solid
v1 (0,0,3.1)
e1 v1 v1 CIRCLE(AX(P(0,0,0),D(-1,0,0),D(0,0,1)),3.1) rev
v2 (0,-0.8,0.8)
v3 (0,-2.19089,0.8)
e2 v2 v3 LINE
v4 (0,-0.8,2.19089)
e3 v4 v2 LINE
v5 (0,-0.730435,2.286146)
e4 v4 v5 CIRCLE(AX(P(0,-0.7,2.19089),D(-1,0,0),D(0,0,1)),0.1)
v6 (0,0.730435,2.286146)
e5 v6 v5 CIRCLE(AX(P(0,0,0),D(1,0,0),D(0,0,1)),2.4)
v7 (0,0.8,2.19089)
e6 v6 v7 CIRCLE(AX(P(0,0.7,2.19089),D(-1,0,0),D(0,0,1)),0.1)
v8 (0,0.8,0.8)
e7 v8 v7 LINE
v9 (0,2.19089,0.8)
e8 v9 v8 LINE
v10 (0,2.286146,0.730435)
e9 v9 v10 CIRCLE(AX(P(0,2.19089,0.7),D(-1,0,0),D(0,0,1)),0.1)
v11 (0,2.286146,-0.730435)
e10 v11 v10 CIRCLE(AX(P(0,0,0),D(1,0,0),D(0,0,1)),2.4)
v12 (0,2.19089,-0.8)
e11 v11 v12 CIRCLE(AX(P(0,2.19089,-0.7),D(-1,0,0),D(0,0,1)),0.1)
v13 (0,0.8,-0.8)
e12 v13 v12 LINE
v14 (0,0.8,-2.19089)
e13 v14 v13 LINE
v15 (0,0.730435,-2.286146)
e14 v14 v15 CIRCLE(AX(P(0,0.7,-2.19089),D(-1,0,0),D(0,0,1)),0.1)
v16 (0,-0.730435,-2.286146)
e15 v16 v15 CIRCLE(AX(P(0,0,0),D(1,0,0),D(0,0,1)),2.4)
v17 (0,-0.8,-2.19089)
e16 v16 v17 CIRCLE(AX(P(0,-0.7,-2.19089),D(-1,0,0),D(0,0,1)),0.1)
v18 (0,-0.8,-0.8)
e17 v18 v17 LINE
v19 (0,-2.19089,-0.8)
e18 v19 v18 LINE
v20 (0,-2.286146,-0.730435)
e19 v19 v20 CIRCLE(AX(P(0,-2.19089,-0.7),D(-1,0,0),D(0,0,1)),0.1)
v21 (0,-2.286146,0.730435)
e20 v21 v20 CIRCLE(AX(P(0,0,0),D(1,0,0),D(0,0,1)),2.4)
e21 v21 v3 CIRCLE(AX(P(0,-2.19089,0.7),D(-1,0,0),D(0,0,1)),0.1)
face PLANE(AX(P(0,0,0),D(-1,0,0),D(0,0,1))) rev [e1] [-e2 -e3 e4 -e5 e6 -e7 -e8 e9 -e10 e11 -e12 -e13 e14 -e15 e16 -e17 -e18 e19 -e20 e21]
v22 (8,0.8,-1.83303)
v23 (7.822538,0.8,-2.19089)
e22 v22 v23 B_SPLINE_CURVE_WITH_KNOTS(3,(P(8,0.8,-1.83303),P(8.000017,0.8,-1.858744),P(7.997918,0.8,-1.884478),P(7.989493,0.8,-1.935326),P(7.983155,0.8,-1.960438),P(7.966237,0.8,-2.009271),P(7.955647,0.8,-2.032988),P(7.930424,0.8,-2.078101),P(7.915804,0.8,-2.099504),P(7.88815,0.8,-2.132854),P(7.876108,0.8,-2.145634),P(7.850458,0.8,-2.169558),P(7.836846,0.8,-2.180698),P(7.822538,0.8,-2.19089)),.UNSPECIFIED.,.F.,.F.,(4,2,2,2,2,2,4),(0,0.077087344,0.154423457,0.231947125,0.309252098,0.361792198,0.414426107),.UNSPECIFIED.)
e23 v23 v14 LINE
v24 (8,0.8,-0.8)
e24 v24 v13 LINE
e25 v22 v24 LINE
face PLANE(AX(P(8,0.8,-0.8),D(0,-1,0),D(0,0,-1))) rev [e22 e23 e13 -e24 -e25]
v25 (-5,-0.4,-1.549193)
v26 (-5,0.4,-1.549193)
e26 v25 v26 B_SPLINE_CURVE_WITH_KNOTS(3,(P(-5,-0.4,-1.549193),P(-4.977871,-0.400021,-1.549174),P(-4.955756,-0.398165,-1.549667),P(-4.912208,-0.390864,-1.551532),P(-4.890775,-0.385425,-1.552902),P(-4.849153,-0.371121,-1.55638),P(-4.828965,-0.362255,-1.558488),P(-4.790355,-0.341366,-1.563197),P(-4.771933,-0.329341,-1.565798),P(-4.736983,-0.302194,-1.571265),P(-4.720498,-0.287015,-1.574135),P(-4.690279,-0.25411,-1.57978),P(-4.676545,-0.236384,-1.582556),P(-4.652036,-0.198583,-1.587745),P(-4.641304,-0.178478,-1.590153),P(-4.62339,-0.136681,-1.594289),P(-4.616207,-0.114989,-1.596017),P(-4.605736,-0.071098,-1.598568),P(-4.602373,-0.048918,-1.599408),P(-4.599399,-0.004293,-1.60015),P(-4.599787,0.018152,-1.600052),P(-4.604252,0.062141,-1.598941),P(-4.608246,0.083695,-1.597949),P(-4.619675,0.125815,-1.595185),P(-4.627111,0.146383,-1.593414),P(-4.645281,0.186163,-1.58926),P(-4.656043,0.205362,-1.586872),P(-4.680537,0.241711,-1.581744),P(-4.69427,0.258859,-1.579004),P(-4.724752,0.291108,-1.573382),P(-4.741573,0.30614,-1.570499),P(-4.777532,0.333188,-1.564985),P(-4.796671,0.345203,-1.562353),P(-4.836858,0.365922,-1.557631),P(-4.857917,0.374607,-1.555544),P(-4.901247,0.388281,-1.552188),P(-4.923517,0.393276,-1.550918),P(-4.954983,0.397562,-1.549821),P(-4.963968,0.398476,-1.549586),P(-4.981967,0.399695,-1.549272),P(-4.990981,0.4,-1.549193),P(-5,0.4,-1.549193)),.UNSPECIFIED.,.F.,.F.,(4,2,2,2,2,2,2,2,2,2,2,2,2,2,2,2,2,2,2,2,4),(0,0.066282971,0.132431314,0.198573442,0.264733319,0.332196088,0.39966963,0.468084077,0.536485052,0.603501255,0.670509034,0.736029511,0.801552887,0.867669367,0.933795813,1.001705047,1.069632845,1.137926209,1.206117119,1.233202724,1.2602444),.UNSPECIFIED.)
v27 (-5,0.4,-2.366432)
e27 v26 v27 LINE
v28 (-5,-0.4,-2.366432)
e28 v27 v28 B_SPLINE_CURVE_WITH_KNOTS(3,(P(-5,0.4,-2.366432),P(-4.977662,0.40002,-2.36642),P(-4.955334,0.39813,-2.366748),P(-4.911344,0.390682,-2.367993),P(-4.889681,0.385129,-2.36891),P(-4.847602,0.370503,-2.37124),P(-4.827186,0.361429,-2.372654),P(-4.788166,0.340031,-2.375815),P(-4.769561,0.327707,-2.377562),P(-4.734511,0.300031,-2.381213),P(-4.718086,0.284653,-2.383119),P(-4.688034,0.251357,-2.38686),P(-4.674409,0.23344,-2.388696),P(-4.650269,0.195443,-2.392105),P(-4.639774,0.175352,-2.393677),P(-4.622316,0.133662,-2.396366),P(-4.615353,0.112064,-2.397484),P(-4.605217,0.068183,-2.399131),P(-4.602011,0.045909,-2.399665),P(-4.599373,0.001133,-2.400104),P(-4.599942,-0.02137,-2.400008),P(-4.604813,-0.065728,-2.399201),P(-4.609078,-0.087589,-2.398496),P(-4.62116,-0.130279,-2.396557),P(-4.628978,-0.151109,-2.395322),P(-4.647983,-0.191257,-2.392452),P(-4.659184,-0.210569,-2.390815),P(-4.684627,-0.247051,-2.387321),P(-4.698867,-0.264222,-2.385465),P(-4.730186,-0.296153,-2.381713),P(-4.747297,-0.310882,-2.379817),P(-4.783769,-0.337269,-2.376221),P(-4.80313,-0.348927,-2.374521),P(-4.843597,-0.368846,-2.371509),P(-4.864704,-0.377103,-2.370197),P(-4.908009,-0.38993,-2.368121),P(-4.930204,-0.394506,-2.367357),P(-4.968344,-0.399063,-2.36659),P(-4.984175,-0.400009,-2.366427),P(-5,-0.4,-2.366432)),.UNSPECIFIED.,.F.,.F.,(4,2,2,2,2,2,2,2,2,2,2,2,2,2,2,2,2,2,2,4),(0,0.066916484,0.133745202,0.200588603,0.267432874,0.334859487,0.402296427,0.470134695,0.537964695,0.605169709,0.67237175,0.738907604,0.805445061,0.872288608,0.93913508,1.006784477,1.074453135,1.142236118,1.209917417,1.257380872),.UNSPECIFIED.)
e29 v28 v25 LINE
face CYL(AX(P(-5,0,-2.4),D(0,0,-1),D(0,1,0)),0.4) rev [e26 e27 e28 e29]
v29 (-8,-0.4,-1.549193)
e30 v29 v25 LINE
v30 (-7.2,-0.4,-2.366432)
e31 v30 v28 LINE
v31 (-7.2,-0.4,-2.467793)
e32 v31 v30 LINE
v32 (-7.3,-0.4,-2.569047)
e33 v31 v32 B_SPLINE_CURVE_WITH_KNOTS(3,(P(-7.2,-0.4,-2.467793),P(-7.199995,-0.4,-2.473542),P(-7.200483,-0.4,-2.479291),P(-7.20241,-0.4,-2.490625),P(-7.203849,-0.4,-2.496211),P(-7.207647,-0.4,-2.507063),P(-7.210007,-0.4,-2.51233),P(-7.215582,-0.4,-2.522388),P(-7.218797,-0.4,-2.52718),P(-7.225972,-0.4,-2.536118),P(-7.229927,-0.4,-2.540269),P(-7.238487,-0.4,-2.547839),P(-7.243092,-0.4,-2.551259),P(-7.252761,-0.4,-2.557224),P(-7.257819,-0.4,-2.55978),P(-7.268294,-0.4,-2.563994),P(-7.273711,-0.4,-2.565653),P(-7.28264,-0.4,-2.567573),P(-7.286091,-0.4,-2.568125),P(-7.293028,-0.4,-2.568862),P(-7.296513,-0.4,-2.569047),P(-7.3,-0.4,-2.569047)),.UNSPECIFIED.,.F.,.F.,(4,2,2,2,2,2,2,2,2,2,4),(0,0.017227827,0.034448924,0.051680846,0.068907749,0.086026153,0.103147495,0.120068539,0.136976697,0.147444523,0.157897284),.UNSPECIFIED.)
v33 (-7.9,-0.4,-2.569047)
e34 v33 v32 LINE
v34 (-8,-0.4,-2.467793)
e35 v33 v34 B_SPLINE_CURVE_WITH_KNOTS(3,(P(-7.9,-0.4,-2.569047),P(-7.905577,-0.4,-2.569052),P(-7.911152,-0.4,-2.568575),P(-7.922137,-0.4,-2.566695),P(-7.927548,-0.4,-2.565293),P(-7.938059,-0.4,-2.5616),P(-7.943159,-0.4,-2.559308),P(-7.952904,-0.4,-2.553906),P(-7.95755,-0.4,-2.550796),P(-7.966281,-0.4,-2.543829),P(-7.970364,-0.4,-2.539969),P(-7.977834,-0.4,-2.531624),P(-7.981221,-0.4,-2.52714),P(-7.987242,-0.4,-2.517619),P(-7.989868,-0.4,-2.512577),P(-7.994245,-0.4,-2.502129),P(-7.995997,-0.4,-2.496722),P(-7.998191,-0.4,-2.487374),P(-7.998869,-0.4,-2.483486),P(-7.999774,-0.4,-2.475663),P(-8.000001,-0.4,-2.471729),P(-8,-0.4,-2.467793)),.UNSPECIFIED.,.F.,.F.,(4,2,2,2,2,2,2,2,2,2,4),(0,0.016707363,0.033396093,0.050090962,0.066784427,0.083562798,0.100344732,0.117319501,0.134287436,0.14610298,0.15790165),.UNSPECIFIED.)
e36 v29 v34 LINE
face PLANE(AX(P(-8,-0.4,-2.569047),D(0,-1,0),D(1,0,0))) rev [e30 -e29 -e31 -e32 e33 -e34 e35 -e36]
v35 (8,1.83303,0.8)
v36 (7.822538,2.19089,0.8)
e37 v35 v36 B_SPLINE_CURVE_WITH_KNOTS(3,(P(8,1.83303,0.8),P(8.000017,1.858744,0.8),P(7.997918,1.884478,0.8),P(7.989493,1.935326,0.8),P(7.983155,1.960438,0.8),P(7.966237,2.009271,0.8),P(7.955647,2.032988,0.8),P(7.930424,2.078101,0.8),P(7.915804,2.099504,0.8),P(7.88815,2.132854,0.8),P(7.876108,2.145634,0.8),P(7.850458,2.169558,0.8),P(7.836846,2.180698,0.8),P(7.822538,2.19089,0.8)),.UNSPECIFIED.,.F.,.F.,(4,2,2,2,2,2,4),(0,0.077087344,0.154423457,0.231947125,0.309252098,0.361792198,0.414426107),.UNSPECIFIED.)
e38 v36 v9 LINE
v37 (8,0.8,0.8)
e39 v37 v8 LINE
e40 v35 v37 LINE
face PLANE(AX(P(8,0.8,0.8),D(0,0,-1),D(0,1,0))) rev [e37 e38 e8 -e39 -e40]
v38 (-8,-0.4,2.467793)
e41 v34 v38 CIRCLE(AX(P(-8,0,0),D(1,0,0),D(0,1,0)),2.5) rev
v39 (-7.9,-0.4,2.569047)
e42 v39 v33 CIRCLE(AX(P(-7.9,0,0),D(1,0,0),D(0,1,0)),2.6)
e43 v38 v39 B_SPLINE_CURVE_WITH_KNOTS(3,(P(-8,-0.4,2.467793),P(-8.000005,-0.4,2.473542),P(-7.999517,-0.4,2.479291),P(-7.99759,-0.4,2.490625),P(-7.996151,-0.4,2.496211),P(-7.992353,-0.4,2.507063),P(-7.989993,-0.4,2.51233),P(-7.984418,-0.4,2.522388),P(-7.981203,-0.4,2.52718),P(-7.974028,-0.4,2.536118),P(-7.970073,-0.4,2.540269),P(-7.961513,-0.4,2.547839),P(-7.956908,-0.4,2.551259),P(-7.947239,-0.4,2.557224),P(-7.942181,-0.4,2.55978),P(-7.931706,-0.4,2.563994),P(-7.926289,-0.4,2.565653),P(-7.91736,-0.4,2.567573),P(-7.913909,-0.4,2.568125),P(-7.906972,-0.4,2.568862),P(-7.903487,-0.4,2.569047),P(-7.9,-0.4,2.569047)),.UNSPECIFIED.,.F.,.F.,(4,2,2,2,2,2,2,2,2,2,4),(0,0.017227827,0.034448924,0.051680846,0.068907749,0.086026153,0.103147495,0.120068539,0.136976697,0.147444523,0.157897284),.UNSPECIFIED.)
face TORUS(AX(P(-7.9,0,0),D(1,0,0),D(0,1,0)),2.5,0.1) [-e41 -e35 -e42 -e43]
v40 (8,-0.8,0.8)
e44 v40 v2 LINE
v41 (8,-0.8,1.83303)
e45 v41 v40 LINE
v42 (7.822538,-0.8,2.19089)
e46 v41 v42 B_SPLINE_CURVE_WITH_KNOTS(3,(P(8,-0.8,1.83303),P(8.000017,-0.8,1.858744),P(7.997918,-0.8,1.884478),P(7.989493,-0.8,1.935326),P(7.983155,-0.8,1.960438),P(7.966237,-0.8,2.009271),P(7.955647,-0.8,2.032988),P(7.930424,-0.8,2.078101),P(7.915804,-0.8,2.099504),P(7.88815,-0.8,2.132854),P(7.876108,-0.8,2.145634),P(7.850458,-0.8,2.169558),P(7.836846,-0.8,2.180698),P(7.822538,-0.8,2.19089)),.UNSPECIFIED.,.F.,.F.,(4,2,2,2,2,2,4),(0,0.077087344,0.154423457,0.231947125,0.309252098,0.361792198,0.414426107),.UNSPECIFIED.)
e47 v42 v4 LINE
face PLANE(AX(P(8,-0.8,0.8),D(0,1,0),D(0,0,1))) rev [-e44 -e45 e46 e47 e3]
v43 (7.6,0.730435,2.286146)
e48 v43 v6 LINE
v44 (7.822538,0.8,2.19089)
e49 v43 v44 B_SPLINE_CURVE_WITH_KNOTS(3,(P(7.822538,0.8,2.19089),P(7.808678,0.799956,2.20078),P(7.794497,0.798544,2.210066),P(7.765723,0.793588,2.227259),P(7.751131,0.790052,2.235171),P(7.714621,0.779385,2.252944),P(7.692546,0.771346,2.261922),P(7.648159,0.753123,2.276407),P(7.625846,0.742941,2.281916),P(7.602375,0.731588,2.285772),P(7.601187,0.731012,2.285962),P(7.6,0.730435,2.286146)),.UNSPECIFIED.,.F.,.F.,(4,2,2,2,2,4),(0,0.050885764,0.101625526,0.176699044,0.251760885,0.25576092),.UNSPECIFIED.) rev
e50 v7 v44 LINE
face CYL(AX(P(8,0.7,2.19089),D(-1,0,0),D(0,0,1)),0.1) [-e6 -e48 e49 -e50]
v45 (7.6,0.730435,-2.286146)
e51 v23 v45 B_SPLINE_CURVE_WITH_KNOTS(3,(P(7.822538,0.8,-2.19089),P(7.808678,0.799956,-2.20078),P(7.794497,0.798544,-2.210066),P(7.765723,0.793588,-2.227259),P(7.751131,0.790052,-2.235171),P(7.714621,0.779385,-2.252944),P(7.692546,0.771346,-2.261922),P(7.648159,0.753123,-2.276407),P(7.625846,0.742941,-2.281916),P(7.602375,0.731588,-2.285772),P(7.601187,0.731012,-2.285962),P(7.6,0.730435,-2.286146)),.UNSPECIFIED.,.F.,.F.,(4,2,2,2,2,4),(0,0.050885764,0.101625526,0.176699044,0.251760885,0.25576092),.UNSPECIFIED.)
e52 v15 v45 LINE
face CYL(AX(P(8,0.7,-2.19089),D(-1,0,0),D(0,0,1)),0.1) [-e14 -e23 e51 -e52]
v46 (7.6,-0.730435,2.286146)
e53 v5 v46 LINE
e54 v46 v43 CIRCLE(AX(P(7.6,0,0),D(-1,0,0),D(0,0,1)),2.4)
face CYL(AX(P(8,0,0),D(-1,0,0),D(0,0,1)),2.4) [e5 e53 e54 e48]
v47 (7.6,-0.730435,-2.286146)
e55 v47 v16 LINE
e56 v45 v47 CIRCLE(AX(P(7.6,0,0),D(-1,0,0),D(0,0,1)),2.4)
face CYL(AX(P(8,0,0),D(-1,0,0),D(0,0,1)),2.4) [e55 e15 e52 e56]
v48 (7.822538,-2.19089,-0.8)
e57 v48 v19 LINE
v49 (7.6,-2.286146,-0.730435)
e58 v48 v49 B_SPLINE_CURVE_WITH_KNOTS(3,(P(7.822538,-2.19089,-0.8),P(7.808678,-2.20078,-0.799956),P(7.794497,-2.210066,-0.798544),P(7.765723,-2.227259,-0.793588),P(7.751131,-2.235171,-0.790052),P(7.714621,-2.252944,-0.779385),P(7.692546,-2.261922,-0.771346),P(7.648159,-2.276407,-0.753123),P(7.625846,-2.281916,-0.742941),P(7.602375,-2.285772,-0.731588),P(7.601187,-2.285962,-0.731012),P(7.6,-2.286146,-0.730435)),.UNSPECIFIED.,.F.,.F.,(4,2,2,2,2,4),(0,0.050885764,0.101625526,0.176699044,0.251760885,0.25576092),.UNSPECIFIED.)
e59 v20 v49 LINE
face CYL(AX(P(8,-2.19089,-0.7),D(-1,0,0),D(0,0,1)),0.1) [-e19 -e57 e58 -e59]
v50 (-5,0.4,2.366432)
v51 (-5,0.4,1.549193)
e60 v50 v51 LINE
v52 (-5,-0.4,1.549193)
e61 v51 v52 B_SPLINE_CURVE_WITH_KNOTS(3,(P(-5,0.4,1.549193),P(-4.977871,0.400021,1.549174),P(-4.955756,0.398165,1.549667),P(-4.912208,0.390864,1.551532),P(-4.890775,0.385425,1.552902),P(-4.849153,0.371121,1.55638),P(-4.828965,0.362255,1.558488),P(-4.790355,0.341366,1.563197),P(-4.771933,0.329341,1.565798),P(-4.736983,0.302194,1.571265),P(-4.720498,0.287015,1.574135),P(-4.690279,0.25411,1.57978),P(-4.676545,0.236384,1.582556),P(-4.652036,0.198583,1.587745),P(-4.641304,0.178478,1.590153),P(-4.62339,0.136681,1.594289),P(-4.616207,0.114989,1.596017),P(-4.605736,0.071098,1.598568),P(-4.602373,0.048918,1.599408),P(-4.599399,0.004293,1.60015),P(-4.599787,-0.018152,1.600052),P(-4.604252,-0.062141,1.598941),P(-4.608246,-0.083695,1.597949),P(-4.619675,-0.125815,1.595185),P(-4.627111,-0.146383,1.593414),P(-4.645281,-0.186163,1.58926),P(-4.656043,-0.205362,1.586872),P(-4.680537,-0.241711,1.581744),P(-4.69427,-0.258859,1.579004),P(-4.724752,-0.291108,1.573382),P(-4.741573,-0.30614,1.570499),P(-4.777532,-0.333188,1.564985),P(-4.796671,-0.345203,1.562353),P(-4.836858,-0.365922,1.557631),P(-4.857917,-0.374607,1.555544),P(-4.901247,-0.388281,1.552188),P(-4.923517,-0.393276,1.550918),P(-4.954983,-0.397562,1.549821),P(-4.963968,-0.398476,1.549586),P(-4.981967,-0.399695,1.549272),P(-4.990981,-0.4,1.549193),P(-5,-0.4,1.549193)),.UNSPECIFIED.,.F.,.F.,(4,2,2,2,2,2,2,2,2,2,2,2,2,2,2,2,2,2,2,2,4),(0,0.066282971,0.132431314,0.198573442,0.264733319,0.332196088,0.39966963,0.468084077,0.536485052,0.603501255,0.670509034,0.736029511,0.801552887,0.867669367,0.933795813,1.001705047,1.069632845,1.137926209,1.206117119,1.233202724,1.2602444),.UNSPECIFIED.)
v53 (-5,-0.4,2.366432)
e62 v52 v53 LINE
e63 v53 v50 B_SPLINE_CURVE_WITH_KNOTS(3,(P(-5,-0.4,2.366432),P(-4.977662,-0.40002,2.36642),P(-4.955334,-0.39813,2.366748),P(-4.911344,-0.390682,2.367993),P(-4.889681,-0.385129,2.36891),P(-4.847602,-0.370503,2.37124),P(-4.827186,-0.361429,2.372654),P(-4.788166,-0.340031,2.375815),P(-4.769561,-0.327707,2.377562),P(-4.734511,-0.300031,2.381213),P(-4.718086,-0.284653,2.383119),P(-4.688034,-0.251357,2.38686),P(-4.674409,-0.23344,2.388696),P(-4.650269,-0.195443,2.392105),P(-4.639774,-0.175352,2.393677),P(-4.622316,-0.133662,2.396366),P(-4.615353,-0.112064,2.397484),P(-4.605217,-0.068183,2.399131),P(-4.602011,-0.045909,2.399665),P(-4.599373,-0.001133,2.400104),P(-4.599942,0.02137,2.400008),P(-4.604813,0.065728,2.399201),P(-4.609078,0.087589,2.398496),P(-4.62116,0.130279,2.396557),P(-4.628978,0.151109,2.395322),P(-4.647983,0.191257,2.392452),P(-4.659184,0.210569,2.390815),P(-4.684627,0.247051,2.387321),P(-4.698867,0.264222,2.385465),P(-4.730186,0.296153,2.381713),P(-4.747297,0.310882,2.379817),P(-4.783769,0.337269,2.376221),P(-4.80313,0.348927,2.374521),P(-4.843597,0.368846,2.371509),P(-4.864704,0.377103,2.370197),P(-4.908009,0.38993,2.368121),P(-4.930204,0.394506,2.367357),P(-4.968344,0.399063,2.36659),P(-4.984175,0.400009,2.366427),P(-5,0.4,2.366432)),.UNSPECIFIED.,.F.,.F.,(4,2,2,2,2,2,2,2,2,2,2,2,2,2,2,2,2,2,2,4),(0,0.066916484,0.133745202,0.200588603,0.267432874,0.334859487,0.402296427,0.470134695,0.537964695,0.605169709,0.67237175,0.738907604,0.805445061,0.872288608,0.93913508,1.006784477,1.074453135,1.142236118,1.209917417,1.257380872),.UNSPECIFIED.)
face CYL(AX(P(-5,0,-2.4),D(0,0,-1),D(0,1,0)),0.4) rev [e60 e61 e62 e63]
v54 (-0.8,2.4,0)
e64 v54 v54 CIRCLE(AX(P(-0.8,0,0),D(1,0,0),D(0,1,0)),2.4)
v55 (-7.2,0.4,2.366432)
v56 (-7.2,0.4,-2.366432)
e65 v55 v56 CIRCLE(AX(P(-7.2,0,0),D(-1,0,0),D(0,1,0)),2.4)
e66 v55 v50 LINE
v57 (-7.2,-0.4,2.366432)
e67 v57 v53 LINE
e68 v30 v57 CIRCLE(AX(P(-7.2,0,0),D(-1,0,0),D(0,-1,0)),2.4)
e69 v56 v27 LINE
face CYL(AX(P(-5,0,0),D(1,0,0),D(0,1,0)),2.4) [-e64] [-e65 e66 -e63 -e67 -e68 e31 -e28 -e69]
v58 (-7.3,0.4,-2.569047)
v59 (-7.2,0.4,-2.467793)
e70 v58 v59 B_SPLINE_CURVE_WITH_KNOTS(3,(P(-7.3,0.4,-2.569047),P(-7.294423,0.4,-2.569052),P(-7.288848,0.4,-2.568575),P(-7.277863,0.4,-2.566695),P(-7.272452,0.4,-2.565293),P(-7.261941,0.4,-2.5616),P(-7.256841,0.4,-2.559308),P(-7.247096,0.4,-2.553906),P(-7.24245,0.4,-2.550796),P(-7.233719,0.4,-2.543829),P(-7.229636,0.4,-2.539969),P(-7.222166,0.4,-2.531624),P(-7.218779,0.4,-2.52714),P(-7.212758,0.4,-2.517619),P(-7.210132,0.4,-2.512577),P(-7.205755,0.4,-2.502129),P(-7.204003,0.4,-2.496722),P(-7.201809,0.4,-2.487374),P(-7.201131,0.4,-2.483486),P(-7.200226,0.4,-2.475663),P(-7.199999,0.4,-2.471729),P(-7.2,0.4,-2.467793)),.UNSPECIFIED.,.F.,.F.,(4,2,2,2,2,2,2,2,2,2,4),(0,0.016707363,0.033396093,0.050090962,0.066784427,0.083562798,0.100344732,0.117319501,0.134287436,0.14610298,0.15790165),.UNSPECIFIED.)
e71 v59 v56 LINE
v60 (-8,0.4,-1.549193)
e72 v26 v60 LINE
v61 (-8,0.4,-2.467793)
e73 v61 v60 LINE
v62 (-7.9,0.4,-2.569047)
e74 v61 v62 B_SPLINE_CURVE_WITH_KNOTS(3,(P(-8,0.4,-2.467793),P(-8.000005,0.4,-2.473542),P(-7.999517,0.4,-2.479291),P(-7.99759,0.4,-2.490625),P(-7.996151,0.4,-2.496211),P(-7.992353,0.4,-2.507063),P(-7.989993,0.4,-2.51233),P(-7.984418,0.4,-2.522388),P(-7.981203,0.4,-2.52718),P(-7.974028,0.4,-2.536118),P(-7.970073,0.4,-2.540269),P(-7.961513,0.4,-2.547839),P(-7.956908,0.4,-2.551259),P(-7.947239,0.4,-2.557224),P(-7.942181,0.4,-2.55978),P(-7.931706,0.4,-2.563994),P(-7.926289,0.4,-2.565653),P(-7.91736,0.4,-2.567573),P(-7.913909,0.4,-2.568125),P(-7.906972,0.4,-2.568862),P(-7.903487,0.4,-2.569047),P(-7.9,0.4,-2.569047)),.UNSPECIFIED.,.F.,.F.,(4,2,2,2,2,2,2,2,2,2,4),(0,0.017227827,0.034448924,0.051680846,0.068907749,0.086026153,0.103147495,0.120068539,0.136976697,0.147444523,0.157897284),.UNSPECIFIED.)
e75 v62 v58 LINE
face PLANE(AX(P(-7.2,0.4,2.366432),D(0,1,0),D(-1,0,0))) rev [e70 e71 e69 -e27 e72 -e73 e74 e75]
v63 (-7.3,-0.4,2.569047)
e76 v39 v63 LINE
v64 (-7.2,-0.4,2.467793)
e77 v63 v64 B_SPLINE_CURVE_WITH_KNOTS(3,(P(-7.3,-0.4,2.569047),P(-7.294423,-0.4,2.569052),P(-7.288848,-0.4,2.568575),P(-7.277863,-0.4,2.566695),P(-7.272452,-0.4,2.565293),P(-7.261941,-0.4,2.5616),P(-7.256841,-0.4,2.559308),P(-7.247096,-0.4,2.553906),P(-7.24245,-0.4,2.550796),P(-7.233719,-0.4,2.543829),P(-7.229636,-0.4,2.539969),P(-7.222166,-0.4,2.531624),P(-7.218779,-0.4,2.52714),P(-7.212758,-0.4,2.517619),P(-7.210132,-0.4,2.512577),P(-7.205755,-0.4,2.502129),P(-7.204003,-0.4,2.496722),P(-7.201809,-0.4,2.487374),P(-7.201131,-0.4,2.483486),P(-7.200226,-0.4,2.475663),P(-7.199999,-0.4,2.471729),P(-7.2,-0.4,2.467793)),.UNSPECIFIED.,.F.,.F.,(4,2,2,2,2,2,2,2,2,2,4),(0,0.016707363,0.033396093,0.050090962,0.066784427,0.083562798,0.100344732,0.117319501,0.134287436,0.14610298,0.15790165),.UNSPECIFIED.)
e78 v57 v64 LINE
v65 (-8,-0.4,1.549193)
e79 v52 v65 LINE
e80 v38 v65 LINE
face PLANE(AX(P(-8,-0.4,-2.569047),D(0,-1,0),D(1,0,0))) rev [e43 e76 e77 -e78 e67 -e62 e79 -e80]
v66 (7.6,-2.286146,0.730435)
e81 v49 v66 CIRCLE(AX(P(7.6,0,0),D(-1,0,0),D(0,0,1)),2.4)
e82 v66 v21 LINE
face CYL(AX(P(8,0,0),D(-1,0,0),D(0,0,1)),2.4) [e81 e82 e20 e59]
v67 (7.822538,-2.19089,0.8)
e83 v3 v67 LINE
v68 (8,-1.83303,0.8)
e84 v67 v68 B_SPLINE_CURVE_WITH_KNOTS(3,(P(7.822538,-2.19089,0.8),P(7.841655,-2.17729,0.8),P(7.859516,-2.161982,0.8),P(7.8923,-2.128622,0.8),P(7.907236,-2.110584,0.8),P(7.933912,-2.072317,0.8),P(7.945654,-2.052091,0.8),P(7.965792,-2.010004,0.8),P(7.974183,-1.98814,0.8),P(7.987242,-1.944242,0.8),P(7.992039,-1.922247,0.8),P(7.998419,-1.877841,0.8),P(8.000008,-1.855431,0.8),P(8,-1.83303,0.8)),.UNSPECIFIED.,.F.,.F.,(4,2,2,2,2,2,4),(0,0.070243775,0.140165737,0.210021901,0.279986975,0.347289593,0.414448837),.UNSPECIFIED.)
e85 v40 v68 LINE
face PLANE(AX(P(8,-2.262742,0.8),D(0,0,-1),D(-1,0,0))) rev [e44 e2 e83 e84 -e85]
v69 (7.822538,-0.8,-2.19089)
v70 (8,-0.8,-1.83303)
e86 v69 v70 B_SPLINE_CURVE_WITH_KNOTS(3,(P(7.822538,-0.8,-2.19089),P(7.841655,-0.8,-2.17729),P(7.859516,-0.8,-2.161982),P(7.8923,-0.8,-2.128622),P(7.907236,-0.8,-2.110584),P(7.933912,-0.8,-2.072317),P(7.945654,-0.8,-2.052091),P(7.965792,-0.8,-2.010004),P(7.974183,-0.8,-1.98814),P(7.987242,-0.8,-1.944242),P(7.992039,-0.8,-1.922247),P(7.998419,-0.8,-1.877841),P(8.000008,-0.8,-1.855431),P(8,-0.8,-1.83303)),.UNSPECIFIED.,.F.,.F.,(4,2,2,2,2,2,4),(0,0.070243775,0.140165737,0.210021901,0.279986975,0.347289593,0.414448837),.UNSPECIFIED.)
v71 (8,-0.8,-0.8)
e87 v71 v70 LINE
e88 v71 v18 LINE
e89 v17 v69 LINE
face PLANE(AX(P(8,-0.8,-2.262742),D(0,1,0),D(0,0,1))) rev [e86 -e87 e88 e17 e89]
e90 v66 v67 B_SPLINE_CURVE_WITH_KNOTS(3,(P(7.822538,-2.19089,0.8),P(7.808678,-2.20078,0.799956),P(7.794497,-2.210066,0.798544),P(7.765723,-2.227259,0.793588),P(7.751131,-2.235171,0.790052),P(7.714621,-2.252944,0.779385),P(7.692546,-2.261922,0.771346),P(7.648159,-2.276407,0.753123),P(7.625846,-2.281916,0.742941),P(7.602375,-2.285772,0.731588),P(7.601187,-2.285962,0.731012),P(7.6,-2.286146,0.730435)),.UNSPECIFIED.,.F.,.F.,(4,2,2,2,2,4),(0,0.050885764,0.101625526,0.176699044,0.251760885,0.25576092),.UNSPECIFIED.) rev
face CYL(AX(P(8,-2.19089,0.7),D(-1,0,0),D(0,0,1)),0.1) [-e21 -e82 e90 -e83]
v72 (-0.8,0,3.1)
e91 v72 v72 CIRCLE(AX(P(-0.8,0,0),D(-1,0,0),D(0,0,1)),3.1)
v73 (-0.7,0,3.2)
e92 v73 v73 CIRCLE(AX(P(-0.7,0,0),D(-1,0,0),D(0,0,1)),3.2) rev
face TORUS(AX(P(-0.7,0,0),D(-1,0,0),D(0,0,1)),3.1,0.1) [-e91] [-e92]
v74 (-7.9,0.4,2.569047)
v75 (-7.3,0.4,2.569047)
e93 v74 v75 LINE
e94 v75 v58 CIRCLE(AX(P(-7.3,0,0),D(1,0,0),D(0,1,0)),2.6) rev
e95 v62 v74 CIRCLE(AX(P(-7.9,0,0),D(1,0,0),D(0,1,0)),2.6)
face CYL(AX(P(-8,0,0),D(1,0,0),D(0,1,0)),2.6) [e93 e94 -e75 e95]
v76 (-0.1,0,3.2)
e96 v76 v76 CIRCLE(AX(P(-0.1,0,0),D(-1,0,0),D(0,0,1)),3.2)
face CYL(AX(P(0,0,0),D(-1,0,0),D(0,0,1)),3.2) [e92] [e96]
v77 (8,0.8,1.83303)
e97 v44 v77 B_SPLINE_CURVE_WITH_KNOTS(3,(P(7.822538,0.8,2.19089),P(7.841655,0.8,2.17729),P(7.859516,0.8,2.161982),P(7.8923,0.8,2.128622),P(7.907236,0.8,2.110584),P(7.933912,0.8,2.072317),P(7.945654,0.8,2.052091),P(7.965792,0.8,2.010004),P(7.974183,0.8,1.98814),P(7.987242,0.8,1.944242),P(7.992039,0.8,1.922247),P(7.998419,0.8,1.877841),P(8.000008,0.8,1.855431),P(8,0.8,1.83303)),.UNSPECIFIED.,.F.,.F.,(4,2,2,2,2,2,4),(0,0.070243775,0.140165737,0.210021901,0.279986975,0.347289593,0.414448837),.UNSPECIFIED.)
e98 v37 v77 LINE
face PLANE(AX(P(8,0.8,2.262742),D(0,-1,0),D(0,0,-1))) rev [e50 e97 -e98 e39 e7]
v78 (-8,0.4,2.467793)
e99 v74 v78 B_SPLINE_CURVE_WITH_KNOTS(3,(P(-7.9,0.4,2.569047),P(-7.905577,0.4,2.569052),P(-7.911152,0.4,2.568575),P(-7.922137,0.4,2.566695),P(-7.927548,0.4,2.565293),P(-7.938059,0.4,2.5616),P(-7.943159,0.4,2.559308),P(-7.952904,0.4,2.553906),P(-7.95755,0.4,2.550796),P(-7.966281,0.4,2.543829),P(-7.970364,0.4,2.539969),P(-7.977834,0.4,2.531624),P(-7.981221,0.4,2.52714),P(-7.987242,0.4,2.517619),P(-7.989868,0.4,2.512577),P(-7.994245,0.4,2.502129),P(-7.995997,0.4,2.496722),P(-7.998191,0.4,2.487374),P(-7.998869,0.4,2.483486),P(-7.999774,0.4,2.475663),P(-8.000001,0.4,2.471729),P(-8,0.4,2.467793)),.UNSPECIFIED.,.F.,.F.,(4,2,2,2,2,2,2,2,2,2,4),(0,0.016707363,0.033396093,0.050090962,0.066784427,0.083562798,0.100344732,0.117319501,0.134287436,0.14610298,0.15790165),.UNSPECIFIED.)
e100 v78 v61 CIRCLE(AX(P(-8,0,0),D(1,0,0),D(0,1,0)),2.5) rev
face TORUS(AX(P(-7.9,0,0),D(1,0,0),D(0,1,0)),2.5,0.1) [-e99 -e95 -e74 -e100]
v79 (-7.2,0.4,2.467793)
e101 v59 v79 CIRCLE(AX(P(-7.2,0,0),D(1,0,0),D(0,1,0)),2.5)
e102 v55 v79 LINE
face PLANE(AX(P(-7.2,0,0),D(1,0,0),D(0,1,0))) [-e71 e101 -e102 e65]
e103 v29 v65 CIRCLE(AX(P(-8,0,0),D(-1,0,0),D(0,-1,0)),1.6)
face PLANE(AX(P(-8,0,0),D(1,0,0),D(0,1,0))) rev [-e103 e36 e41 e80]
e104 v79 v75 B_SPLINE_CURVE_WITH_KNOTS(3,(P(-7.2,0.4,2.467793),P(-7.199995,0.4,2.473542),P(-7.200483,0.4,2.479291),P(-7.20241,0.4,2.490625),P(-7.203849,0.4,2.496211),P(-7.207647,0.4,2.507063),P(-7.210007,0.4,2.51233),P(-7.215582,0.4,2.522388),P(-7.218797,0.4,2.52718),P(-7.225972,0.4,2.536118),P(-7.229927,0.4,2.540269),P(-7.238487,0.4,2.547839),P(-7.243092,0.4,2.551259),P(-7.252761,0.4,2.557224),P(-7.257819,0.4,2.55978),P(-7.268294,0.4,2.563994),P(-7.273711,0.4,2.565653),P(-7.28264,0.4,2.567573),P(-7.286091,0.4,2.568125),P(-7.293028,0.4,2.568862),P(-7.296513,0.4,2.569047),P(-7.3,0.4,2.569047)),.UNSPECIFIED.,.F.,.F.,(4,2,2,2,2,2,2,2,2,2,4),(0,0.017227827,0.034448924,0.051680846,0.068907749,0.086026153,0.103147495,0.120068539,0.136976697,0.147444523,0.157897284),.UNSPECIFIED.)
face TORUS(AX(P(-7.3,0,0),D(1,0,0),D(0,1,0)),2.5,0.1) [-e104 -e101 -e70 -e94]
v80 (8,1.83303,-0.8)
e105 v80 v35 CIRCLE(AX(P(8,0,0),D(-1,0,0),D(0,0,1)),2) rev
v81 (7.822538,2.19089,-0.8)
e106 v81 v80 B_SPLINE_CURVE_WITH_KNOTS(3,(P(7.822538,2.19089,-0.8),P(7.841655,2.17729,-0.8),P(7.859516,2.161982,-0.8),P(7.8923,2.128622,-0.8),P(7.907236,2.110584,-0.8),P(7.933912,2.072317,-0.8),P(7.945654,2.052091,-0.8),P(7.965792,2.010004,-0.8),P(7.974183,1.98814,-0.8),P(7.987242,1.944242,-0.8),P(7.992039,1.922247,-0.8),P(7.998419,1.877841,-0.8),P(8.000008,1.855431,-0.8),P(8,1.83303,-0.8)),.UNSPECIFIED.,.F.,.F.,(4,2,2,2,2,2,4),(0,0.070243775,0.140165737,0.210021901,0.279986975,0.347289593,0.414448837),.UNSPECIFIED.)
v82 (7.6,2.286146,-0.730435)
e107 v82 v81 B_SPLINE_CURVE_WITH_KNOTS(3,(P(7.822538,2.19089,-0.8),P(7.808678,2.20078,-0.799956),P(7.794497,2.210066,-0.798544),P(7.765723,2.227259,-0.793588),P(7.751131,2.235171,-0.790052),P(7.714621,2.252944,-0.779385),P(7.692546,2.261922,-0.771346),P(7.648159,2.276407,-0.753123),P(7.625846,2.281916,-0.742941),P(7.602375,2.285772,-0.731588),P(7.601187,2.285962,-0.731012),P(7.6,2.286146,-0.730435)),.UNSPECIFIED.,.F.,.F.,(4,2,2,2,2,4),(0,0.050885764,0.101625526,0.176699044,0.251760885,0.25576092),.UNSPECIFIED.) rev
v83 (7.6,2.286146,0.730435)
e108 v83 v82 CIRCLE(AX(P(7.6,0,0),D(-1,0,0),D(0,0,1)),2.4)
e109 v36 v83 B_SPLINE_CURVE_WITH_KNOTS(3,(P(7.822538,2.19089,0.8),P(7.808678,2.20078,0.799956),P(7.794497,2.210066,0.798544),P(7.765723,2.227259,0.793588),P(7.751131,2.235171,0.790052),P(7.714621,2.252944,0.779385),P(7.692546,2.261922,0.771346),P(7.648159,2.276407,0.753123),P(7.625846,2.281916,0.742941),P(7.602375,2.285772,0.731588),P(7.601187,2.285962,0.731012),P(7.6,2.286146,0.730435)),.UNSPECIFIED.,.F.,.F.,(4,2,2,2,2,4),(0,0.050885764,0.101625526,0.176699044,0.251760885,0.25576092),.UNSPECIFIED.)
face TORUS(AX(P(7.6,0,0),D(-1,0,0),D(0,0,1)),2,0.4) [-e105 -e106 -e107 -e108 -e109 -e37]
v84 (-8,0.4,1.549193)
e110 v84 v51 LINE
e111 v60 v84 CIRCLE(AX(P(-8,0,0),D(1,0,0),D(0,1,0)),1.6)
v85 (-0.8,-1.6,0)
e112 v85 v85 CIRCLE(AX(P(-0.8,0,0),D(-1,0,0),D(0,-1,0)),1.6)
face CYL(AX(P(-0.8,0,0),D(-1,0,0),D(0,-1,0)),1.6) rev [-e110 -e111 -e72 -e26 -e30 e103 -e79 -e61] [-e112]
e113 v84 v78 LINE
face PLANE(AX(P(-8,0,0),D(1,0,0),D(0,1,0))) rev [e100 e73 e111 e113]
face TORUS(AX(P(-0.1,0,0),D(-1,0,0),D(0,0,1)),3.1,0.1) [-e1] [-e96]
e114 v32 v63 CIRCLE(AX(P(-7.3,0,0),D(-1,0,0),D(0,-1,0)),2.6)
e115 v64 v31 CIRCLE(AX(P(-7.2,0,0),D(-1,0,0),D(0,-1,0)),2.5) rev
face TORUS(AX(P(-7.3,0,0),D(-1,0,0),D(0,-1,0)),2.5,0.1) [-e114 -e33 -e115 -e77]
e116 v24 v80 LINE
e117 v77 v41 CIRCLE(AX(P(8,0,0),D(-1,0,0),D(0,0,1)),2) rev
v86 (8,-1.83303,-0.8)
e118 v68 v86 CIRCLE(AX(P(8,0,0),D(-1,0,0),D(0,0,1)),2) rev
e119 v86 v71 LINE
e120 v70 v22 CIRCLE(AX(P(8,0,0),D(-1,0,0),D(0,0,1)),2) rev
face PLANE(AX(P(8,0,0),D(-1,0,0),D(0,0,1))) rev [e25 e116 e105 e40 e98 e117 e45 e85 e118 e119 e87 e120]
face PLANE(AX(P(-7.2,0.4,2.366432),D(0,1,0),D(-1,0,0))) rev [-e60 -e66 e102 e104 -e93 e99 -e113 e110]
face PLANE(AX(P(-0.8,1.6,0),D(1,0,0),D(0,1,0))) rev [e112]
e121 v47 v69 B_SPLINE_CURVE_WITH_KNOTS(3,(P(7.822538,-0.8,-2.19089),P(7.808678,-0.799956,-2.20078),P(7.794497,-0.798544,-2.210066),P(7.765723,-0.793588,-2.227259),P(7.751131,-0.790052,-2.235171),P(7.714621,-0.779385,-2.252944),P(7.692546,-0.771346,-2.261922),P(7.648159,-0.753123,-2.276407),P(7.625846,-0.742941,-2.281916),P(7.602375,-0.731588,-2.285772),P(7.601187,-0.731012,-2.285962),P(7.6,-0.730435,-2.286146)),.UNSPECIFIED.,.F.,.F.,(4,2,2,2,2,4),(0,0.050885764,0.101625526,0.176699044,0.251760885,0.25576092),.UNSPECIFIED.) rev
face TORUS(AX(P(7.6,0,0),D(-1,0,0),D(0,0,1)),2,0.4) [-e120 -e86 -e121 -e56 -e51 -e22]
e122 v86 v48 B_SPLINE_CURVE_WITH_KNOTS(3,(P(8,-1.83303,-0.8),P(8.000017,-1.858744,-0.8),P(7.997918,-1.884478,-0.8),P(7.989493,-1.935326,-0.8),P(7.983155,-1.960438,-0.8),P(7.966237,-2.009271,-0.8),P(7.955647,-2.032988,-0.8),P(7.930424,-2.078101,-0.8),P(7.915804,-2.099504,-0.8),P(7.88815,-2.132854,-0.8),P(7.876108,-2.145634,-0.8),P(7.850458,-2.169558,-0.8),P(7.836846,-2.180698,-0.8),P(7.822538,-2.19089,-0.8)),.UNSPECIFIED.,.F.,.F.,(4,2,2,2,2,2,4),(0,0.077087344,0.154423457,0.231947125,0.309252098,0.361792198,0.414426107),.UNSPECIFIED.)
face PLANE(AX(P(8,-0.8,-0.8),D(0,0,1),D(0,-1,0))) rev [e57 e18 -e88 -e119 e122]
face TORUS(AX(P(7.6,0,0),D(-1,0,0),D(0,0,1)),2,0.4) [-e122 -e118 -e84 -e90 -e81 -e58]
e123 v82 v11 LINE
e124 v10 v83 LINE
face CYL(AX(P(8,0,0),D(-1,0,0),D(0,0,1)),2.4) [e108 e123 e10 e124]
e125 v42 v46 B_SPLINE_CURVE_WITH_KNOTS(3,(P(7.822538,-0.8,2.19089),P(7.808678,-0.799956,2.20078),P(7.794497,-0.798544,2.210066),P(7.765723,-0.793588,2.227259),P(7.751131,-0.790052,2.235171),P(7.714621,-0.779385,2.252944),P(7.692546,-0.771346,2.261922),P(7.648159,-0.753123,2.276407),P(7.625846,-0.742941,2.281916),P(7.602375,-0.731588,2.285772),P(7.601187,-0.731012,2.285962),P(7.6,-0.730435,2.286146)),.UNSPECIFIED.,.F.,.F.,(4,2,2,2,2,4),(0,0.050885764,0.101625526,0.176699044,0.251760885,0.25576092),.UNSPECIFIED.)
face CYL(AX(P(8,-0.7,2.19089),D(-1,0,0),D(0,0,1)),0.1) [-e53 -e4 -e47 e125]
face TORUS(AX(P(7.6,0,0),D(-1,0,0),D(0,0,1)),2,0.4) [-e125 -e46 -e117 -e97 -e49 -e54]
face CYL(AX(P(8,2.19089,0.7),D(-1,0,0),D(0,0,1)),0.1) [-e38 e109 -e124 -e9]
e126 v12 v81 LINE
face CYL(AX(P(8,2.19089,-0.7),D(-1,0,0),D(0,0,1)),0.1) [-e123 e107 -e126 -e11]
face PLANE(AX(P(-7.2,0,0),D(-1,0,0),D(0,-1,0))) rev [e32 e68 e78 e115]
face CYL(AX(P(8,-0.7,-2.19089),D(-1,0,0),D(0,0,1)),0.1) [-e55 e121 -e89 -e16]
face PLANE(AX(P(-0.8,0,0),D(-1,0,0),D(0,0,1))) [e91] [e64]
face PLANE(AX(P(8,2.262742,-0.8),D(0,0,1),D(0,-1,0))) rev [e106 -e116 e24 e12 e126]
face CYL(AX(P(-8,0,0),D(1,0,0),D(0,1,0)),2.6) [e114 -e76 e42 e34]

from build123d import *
from build123d.topology import SkipClean

# Parameters (mm, degrees)
SKETCH1_W                  = 4.2
SKETCH1_H                  = 2.4
F_0_8_0_8_DIAMETER_HOLE1_D = 0.8
SKETCH6_R                  = 3.2
BOSS_EXTRUDE1_DEPTH        = 0.8
BOSS_EXTRUDE2_DEPTH        = 3
CUT_EXTRUDE1_DEPTH         = 2.2
BOSS_EXTRUDE3_DEPTH        = 2.2
BOSS_EXTRUDE4_DEPTH        = 0.8
BOSS_EXTRUDE5_START        = 8
BOSS_EXTRUDE5_DEPTH        = 8
SKETCH16_W                 = 7.2
SKETCH16_H                 = 1.6
FILLET1_R                  = 0.1
FILLET2_R                  = 0.4


with BuildPart() as part:
    # Sketch1 → Revolve1 (revolve)
    with BuildSketch(Plane.XY):
        with Locations((-2.9, 1.2)):
            Rectangle(SKETCH1_W, SKETCH1_H)
    revolve(axis=Axis((-5, 0, 0), (1, 0, 0)))

    # Ø0.8 (0.8) Diameter Hole1 (through all)
    with Locations(Plane(origin=(-5, 0, -2.4), x_dir=(0, -1, 0), z_dir=(0, 0, -1))):
        with Locations((0, 0)):
            Hole(F_0_8_0_8_DIAMETER_HOLE1_D / 2)

    # Sketch6 → Boss-Extrude1 (add)
    with BuildSketch(Plane.ZY.offset(0.8)):
        Circle(SKETCH6_R)
    extrude(amount=-BOSS_EXTRUDE1_DEPTH)

    # Sketch7 → Boss-Extrude2 (add)
    with BuildSketch(Plane.ZY.offset(5)):
        with BuildLine():
            Line((-2.569046516, -0.4), (2.569046516, -0.4))
            ThreePointArc((2.569046516, -0.4), (0, -2.6), (-2.569046516, -0.4))
        make_face()
    extrude(amount=BOSS_EXTRUDE2_DEPTH)

    # Sketch8 → Cut-Extrude1 (cut)
    with SkipClean():  # the faces are left unmerged after this step: merging them gives an invalid solid
        with BuildSketch(Plane(origin=(-5, 0, 0), x_dir=(0, 0, -1), z_dir=(1, 0, 0))):
            with BuildLine():
                Line((2.569046516, -0.4), (2.366431913, -0.4))
                ThreePointArc((2.366431913, -0.4), (0, -2.4), (-2.366431913, -0.4))
                Line((-2.366431913, -0.4), (-2.569046516, -0.4))
                ThreePointArc((-2.569046516, -0.4), (0, -2.6), (2.569046516, -0.4))
            make_face()
        extrude(amount=-CUT_EXTRUDE1_DEPTH, mode=Mode.SUBTRACT)

    # Sketch9 → Boss-Extrude3 (add)
    with SkipClean():  # the faces are left unmerged after this step: merging them gives an invalid solid
        with BuildSketch(Plane.ZY.offset(5)):
            with BuildLine():
                Line((2.366431913, 0.4), (-2.366431913, 0.4))
                ThreePointArc((-2.366431913, 0.4), (0, 2.4), (2.366431913, 0.4))
            make_face()
        extrude(amount=BOSS_EXTRUDE3_DEPTH)

    # Sketch10 → Boss-Extrude4 (add)
    with SkipClean():  # the faces are left unmerged after this step: merging them gives an invalid solid
        with BuildSketch(Plane.ZY.offset(7.2)):
            with BuildLine():
                Line((2.569046516, 0.4), (-2.569046516, 0.4))
                ThreePointArc((-2.569046516, 0.4), (0, 2.6), (2.569046516, 0.4))
            make_face()
        extrude(amount=BOSS_EXTRUDE4_DEPTH)

    # Sketch11 → Boss-Extrude5 (add)
    with SkipClean():  # the faces are left unmerged after this step: merging them gives an invalid solid
        with BuildSketch(Plane(origin=(0, 0, 0), x_dir=(0, 0, -1), z_dir=(1, 0, 0)).offset(BOSS_EXTRUDE5_START)):
            with BuildLine():
                Line((2.2627417, -0.8), (0.8, -0.8))
                Line((0.8, -0.8), (0.8, -2.2627417))
                ThreePointArc((0.8, -2.2627417), (0, -2.4), (-0.8, -2.2627417))
                Line((-0.8, -2.2627417), (-0.8, -0.8))
                Line((-0.8, -0.8), (-2.2627417, -0.8))
                ThreePointArc((-2.2627417, -0.8), (-2.4, 0), (-2.2627417, 0.8))
                Line((-2.2627417, 0.8), (-0.8, 0.8))
                Line((-0.8, 0.8), (-0.8, 2.2627417))
                ThreePointArc((-0.8, 2.2627417), (0, 2.4), (0.8, 2.2627417))
                Line((0.8, 2.2627417), (0.8, 0.8))
                Line((0.8, 0.8), (2.2627417, 0.8))
                ThreePointArc((2.2627417, 0.8), (2.4, 0), (2.2627417, -0.8))
            make_face()
        extrude(amount=-BOSS_EXTRUDE5_DEPTH)

    # Sketch16 → Cut-Revolve1 (revolve, cut)
    with SkipClean():  # the faces are left unmerged after this step: merging them gives an invalid solid
        with BuildSketch(Plane(origin=(0, 0, 0), x_dir=(-1, 0, 0), z_dir=(0, 0, -1))):
            with Locations((4.4, 0.8)):
                Rectangle(SKETCH16_W, SKETCH16_H)
        revolve(axis=Axis((-0.8, 0, 0), (-1, 0, 0)), mode=Mode.SUBTRACT)

    # Fillet1
    fillet1_edges = [part.edges().sort_by_distance(p)[0] for p in [
        (0, 0, -3.2),
        (-0.8, 0, -3.2),
        (-8, -2.6, 0),
        (-7.2, -2.6, 0),
        (-7.2, 2.6, 0),
        (-8, 2.6, 0),
        (4, -0.8, -2.2627417),
        (4, 0.8, -2.2627417),
        (4, 2.2627417, -0.8),
        (4, 2.2627417, 0.8),
        (4, 0.8, 2.2627417),
        (4, -0.8, 2.2627417),
        (4, -2.2627417, 0.8),
        (4, -2.2627417, -0.8),
    ]]
    fillet(fillet1_edges, radius=FILLET1_R)

    # Fillet2
    # the kernel refuses this fillet: 0.4 mm, written as the material it takes off along each edge
    with BuildSketch(Plane(origin=(8, 0, 0), x_dir=(0, -0.6638434598853418, 0.7478715536557455), z_dir=(0, -0.7478715536557455, -0.6638434598853418))) as fillet2_piece_1:
        with BuildLine():
            CenterArc((2.4 - FILLET2_R, FILLET2_R), FILLET2_R, 270, 90)
            Line((2.4 - FILLET2_R, 0), (2.4, 0))
            Line((2.4, 0), (2.4, FILLET2_R))
        make_face()
    revolve(axis=Axis((8, 0, 0), (-1, 0, 0)), revolution_arc=83.187319702, mode=Mode.SUBTRACT)
    with BuildSketch(Plane(origin=(8, 0, 0), x_dir=(0, -0.7478715536557221, -0.6638434598853682), z_dir=(0, 0.6638434598853682, -0.7478715536557221))) as fillet2_piece_2:
        with BuildLine():
            CenterArc((2.4 - FILLET2_R, FILLET2_R), FILLET2_R, 270, 90)
            Line((2.4 - FILLET2_R, 0), (2.4, 0))
            Line((2.4, 0), (2.4, FILLET2_R))
        make_face()
    revolve(axis=Axis((8, 0, 0), (-1, 0, 0)), revolution_arc=83.187319702, mode=Mode.SUBTRACT)
    with BuildSketch(Plane(origin=(8, 0, 0), x_dir=(0, 0.7478715536557219, 0.6638434598853683), z_dir=(0, -0.6638434598853683, 0.7478715536557219))) as fillet2_piece_3:
        with BuildLine():
            CenterArc((2.4 - FILLET2_R, FILLET2_R), FILLET2_R, 270, 90)
            Line((2.4 - FILLET2_R, 0), (2.4, 0))
            Line((2.4, 0), (2.4, FILLET2_R))
        make_face()
    revolve(axis=Axis((8, 0, 0), (-1, 0, 0)), revolution_arc=83.187319702, mode=Mode.SUBTRACT)
    with BuildSketch(Plane(origin=(8, 0, 0), x_dir=(0, 0.6638434598852943, -0.7478715536557876), z_dir=(0, 0.7478715536557876, 0.6638434598852943))) as fillet2_piece_4:
        with BuildLine():
            CenterArc((2.4 - FILLET2_R, FILLET2_R), FILLET2_R, 270, 90)
            Line((2.4 - FILLET2_R, 0), (2.4, 0))
            Line((2.4, 0), (2.4, FILLET2_R))
        make_face()
    revolve(axis=Axis((8, 0, 0), (-1, 0, 0)), revolution_arc=83.187319702, mode=Mode.SUBTRACT)


solid = part.part
